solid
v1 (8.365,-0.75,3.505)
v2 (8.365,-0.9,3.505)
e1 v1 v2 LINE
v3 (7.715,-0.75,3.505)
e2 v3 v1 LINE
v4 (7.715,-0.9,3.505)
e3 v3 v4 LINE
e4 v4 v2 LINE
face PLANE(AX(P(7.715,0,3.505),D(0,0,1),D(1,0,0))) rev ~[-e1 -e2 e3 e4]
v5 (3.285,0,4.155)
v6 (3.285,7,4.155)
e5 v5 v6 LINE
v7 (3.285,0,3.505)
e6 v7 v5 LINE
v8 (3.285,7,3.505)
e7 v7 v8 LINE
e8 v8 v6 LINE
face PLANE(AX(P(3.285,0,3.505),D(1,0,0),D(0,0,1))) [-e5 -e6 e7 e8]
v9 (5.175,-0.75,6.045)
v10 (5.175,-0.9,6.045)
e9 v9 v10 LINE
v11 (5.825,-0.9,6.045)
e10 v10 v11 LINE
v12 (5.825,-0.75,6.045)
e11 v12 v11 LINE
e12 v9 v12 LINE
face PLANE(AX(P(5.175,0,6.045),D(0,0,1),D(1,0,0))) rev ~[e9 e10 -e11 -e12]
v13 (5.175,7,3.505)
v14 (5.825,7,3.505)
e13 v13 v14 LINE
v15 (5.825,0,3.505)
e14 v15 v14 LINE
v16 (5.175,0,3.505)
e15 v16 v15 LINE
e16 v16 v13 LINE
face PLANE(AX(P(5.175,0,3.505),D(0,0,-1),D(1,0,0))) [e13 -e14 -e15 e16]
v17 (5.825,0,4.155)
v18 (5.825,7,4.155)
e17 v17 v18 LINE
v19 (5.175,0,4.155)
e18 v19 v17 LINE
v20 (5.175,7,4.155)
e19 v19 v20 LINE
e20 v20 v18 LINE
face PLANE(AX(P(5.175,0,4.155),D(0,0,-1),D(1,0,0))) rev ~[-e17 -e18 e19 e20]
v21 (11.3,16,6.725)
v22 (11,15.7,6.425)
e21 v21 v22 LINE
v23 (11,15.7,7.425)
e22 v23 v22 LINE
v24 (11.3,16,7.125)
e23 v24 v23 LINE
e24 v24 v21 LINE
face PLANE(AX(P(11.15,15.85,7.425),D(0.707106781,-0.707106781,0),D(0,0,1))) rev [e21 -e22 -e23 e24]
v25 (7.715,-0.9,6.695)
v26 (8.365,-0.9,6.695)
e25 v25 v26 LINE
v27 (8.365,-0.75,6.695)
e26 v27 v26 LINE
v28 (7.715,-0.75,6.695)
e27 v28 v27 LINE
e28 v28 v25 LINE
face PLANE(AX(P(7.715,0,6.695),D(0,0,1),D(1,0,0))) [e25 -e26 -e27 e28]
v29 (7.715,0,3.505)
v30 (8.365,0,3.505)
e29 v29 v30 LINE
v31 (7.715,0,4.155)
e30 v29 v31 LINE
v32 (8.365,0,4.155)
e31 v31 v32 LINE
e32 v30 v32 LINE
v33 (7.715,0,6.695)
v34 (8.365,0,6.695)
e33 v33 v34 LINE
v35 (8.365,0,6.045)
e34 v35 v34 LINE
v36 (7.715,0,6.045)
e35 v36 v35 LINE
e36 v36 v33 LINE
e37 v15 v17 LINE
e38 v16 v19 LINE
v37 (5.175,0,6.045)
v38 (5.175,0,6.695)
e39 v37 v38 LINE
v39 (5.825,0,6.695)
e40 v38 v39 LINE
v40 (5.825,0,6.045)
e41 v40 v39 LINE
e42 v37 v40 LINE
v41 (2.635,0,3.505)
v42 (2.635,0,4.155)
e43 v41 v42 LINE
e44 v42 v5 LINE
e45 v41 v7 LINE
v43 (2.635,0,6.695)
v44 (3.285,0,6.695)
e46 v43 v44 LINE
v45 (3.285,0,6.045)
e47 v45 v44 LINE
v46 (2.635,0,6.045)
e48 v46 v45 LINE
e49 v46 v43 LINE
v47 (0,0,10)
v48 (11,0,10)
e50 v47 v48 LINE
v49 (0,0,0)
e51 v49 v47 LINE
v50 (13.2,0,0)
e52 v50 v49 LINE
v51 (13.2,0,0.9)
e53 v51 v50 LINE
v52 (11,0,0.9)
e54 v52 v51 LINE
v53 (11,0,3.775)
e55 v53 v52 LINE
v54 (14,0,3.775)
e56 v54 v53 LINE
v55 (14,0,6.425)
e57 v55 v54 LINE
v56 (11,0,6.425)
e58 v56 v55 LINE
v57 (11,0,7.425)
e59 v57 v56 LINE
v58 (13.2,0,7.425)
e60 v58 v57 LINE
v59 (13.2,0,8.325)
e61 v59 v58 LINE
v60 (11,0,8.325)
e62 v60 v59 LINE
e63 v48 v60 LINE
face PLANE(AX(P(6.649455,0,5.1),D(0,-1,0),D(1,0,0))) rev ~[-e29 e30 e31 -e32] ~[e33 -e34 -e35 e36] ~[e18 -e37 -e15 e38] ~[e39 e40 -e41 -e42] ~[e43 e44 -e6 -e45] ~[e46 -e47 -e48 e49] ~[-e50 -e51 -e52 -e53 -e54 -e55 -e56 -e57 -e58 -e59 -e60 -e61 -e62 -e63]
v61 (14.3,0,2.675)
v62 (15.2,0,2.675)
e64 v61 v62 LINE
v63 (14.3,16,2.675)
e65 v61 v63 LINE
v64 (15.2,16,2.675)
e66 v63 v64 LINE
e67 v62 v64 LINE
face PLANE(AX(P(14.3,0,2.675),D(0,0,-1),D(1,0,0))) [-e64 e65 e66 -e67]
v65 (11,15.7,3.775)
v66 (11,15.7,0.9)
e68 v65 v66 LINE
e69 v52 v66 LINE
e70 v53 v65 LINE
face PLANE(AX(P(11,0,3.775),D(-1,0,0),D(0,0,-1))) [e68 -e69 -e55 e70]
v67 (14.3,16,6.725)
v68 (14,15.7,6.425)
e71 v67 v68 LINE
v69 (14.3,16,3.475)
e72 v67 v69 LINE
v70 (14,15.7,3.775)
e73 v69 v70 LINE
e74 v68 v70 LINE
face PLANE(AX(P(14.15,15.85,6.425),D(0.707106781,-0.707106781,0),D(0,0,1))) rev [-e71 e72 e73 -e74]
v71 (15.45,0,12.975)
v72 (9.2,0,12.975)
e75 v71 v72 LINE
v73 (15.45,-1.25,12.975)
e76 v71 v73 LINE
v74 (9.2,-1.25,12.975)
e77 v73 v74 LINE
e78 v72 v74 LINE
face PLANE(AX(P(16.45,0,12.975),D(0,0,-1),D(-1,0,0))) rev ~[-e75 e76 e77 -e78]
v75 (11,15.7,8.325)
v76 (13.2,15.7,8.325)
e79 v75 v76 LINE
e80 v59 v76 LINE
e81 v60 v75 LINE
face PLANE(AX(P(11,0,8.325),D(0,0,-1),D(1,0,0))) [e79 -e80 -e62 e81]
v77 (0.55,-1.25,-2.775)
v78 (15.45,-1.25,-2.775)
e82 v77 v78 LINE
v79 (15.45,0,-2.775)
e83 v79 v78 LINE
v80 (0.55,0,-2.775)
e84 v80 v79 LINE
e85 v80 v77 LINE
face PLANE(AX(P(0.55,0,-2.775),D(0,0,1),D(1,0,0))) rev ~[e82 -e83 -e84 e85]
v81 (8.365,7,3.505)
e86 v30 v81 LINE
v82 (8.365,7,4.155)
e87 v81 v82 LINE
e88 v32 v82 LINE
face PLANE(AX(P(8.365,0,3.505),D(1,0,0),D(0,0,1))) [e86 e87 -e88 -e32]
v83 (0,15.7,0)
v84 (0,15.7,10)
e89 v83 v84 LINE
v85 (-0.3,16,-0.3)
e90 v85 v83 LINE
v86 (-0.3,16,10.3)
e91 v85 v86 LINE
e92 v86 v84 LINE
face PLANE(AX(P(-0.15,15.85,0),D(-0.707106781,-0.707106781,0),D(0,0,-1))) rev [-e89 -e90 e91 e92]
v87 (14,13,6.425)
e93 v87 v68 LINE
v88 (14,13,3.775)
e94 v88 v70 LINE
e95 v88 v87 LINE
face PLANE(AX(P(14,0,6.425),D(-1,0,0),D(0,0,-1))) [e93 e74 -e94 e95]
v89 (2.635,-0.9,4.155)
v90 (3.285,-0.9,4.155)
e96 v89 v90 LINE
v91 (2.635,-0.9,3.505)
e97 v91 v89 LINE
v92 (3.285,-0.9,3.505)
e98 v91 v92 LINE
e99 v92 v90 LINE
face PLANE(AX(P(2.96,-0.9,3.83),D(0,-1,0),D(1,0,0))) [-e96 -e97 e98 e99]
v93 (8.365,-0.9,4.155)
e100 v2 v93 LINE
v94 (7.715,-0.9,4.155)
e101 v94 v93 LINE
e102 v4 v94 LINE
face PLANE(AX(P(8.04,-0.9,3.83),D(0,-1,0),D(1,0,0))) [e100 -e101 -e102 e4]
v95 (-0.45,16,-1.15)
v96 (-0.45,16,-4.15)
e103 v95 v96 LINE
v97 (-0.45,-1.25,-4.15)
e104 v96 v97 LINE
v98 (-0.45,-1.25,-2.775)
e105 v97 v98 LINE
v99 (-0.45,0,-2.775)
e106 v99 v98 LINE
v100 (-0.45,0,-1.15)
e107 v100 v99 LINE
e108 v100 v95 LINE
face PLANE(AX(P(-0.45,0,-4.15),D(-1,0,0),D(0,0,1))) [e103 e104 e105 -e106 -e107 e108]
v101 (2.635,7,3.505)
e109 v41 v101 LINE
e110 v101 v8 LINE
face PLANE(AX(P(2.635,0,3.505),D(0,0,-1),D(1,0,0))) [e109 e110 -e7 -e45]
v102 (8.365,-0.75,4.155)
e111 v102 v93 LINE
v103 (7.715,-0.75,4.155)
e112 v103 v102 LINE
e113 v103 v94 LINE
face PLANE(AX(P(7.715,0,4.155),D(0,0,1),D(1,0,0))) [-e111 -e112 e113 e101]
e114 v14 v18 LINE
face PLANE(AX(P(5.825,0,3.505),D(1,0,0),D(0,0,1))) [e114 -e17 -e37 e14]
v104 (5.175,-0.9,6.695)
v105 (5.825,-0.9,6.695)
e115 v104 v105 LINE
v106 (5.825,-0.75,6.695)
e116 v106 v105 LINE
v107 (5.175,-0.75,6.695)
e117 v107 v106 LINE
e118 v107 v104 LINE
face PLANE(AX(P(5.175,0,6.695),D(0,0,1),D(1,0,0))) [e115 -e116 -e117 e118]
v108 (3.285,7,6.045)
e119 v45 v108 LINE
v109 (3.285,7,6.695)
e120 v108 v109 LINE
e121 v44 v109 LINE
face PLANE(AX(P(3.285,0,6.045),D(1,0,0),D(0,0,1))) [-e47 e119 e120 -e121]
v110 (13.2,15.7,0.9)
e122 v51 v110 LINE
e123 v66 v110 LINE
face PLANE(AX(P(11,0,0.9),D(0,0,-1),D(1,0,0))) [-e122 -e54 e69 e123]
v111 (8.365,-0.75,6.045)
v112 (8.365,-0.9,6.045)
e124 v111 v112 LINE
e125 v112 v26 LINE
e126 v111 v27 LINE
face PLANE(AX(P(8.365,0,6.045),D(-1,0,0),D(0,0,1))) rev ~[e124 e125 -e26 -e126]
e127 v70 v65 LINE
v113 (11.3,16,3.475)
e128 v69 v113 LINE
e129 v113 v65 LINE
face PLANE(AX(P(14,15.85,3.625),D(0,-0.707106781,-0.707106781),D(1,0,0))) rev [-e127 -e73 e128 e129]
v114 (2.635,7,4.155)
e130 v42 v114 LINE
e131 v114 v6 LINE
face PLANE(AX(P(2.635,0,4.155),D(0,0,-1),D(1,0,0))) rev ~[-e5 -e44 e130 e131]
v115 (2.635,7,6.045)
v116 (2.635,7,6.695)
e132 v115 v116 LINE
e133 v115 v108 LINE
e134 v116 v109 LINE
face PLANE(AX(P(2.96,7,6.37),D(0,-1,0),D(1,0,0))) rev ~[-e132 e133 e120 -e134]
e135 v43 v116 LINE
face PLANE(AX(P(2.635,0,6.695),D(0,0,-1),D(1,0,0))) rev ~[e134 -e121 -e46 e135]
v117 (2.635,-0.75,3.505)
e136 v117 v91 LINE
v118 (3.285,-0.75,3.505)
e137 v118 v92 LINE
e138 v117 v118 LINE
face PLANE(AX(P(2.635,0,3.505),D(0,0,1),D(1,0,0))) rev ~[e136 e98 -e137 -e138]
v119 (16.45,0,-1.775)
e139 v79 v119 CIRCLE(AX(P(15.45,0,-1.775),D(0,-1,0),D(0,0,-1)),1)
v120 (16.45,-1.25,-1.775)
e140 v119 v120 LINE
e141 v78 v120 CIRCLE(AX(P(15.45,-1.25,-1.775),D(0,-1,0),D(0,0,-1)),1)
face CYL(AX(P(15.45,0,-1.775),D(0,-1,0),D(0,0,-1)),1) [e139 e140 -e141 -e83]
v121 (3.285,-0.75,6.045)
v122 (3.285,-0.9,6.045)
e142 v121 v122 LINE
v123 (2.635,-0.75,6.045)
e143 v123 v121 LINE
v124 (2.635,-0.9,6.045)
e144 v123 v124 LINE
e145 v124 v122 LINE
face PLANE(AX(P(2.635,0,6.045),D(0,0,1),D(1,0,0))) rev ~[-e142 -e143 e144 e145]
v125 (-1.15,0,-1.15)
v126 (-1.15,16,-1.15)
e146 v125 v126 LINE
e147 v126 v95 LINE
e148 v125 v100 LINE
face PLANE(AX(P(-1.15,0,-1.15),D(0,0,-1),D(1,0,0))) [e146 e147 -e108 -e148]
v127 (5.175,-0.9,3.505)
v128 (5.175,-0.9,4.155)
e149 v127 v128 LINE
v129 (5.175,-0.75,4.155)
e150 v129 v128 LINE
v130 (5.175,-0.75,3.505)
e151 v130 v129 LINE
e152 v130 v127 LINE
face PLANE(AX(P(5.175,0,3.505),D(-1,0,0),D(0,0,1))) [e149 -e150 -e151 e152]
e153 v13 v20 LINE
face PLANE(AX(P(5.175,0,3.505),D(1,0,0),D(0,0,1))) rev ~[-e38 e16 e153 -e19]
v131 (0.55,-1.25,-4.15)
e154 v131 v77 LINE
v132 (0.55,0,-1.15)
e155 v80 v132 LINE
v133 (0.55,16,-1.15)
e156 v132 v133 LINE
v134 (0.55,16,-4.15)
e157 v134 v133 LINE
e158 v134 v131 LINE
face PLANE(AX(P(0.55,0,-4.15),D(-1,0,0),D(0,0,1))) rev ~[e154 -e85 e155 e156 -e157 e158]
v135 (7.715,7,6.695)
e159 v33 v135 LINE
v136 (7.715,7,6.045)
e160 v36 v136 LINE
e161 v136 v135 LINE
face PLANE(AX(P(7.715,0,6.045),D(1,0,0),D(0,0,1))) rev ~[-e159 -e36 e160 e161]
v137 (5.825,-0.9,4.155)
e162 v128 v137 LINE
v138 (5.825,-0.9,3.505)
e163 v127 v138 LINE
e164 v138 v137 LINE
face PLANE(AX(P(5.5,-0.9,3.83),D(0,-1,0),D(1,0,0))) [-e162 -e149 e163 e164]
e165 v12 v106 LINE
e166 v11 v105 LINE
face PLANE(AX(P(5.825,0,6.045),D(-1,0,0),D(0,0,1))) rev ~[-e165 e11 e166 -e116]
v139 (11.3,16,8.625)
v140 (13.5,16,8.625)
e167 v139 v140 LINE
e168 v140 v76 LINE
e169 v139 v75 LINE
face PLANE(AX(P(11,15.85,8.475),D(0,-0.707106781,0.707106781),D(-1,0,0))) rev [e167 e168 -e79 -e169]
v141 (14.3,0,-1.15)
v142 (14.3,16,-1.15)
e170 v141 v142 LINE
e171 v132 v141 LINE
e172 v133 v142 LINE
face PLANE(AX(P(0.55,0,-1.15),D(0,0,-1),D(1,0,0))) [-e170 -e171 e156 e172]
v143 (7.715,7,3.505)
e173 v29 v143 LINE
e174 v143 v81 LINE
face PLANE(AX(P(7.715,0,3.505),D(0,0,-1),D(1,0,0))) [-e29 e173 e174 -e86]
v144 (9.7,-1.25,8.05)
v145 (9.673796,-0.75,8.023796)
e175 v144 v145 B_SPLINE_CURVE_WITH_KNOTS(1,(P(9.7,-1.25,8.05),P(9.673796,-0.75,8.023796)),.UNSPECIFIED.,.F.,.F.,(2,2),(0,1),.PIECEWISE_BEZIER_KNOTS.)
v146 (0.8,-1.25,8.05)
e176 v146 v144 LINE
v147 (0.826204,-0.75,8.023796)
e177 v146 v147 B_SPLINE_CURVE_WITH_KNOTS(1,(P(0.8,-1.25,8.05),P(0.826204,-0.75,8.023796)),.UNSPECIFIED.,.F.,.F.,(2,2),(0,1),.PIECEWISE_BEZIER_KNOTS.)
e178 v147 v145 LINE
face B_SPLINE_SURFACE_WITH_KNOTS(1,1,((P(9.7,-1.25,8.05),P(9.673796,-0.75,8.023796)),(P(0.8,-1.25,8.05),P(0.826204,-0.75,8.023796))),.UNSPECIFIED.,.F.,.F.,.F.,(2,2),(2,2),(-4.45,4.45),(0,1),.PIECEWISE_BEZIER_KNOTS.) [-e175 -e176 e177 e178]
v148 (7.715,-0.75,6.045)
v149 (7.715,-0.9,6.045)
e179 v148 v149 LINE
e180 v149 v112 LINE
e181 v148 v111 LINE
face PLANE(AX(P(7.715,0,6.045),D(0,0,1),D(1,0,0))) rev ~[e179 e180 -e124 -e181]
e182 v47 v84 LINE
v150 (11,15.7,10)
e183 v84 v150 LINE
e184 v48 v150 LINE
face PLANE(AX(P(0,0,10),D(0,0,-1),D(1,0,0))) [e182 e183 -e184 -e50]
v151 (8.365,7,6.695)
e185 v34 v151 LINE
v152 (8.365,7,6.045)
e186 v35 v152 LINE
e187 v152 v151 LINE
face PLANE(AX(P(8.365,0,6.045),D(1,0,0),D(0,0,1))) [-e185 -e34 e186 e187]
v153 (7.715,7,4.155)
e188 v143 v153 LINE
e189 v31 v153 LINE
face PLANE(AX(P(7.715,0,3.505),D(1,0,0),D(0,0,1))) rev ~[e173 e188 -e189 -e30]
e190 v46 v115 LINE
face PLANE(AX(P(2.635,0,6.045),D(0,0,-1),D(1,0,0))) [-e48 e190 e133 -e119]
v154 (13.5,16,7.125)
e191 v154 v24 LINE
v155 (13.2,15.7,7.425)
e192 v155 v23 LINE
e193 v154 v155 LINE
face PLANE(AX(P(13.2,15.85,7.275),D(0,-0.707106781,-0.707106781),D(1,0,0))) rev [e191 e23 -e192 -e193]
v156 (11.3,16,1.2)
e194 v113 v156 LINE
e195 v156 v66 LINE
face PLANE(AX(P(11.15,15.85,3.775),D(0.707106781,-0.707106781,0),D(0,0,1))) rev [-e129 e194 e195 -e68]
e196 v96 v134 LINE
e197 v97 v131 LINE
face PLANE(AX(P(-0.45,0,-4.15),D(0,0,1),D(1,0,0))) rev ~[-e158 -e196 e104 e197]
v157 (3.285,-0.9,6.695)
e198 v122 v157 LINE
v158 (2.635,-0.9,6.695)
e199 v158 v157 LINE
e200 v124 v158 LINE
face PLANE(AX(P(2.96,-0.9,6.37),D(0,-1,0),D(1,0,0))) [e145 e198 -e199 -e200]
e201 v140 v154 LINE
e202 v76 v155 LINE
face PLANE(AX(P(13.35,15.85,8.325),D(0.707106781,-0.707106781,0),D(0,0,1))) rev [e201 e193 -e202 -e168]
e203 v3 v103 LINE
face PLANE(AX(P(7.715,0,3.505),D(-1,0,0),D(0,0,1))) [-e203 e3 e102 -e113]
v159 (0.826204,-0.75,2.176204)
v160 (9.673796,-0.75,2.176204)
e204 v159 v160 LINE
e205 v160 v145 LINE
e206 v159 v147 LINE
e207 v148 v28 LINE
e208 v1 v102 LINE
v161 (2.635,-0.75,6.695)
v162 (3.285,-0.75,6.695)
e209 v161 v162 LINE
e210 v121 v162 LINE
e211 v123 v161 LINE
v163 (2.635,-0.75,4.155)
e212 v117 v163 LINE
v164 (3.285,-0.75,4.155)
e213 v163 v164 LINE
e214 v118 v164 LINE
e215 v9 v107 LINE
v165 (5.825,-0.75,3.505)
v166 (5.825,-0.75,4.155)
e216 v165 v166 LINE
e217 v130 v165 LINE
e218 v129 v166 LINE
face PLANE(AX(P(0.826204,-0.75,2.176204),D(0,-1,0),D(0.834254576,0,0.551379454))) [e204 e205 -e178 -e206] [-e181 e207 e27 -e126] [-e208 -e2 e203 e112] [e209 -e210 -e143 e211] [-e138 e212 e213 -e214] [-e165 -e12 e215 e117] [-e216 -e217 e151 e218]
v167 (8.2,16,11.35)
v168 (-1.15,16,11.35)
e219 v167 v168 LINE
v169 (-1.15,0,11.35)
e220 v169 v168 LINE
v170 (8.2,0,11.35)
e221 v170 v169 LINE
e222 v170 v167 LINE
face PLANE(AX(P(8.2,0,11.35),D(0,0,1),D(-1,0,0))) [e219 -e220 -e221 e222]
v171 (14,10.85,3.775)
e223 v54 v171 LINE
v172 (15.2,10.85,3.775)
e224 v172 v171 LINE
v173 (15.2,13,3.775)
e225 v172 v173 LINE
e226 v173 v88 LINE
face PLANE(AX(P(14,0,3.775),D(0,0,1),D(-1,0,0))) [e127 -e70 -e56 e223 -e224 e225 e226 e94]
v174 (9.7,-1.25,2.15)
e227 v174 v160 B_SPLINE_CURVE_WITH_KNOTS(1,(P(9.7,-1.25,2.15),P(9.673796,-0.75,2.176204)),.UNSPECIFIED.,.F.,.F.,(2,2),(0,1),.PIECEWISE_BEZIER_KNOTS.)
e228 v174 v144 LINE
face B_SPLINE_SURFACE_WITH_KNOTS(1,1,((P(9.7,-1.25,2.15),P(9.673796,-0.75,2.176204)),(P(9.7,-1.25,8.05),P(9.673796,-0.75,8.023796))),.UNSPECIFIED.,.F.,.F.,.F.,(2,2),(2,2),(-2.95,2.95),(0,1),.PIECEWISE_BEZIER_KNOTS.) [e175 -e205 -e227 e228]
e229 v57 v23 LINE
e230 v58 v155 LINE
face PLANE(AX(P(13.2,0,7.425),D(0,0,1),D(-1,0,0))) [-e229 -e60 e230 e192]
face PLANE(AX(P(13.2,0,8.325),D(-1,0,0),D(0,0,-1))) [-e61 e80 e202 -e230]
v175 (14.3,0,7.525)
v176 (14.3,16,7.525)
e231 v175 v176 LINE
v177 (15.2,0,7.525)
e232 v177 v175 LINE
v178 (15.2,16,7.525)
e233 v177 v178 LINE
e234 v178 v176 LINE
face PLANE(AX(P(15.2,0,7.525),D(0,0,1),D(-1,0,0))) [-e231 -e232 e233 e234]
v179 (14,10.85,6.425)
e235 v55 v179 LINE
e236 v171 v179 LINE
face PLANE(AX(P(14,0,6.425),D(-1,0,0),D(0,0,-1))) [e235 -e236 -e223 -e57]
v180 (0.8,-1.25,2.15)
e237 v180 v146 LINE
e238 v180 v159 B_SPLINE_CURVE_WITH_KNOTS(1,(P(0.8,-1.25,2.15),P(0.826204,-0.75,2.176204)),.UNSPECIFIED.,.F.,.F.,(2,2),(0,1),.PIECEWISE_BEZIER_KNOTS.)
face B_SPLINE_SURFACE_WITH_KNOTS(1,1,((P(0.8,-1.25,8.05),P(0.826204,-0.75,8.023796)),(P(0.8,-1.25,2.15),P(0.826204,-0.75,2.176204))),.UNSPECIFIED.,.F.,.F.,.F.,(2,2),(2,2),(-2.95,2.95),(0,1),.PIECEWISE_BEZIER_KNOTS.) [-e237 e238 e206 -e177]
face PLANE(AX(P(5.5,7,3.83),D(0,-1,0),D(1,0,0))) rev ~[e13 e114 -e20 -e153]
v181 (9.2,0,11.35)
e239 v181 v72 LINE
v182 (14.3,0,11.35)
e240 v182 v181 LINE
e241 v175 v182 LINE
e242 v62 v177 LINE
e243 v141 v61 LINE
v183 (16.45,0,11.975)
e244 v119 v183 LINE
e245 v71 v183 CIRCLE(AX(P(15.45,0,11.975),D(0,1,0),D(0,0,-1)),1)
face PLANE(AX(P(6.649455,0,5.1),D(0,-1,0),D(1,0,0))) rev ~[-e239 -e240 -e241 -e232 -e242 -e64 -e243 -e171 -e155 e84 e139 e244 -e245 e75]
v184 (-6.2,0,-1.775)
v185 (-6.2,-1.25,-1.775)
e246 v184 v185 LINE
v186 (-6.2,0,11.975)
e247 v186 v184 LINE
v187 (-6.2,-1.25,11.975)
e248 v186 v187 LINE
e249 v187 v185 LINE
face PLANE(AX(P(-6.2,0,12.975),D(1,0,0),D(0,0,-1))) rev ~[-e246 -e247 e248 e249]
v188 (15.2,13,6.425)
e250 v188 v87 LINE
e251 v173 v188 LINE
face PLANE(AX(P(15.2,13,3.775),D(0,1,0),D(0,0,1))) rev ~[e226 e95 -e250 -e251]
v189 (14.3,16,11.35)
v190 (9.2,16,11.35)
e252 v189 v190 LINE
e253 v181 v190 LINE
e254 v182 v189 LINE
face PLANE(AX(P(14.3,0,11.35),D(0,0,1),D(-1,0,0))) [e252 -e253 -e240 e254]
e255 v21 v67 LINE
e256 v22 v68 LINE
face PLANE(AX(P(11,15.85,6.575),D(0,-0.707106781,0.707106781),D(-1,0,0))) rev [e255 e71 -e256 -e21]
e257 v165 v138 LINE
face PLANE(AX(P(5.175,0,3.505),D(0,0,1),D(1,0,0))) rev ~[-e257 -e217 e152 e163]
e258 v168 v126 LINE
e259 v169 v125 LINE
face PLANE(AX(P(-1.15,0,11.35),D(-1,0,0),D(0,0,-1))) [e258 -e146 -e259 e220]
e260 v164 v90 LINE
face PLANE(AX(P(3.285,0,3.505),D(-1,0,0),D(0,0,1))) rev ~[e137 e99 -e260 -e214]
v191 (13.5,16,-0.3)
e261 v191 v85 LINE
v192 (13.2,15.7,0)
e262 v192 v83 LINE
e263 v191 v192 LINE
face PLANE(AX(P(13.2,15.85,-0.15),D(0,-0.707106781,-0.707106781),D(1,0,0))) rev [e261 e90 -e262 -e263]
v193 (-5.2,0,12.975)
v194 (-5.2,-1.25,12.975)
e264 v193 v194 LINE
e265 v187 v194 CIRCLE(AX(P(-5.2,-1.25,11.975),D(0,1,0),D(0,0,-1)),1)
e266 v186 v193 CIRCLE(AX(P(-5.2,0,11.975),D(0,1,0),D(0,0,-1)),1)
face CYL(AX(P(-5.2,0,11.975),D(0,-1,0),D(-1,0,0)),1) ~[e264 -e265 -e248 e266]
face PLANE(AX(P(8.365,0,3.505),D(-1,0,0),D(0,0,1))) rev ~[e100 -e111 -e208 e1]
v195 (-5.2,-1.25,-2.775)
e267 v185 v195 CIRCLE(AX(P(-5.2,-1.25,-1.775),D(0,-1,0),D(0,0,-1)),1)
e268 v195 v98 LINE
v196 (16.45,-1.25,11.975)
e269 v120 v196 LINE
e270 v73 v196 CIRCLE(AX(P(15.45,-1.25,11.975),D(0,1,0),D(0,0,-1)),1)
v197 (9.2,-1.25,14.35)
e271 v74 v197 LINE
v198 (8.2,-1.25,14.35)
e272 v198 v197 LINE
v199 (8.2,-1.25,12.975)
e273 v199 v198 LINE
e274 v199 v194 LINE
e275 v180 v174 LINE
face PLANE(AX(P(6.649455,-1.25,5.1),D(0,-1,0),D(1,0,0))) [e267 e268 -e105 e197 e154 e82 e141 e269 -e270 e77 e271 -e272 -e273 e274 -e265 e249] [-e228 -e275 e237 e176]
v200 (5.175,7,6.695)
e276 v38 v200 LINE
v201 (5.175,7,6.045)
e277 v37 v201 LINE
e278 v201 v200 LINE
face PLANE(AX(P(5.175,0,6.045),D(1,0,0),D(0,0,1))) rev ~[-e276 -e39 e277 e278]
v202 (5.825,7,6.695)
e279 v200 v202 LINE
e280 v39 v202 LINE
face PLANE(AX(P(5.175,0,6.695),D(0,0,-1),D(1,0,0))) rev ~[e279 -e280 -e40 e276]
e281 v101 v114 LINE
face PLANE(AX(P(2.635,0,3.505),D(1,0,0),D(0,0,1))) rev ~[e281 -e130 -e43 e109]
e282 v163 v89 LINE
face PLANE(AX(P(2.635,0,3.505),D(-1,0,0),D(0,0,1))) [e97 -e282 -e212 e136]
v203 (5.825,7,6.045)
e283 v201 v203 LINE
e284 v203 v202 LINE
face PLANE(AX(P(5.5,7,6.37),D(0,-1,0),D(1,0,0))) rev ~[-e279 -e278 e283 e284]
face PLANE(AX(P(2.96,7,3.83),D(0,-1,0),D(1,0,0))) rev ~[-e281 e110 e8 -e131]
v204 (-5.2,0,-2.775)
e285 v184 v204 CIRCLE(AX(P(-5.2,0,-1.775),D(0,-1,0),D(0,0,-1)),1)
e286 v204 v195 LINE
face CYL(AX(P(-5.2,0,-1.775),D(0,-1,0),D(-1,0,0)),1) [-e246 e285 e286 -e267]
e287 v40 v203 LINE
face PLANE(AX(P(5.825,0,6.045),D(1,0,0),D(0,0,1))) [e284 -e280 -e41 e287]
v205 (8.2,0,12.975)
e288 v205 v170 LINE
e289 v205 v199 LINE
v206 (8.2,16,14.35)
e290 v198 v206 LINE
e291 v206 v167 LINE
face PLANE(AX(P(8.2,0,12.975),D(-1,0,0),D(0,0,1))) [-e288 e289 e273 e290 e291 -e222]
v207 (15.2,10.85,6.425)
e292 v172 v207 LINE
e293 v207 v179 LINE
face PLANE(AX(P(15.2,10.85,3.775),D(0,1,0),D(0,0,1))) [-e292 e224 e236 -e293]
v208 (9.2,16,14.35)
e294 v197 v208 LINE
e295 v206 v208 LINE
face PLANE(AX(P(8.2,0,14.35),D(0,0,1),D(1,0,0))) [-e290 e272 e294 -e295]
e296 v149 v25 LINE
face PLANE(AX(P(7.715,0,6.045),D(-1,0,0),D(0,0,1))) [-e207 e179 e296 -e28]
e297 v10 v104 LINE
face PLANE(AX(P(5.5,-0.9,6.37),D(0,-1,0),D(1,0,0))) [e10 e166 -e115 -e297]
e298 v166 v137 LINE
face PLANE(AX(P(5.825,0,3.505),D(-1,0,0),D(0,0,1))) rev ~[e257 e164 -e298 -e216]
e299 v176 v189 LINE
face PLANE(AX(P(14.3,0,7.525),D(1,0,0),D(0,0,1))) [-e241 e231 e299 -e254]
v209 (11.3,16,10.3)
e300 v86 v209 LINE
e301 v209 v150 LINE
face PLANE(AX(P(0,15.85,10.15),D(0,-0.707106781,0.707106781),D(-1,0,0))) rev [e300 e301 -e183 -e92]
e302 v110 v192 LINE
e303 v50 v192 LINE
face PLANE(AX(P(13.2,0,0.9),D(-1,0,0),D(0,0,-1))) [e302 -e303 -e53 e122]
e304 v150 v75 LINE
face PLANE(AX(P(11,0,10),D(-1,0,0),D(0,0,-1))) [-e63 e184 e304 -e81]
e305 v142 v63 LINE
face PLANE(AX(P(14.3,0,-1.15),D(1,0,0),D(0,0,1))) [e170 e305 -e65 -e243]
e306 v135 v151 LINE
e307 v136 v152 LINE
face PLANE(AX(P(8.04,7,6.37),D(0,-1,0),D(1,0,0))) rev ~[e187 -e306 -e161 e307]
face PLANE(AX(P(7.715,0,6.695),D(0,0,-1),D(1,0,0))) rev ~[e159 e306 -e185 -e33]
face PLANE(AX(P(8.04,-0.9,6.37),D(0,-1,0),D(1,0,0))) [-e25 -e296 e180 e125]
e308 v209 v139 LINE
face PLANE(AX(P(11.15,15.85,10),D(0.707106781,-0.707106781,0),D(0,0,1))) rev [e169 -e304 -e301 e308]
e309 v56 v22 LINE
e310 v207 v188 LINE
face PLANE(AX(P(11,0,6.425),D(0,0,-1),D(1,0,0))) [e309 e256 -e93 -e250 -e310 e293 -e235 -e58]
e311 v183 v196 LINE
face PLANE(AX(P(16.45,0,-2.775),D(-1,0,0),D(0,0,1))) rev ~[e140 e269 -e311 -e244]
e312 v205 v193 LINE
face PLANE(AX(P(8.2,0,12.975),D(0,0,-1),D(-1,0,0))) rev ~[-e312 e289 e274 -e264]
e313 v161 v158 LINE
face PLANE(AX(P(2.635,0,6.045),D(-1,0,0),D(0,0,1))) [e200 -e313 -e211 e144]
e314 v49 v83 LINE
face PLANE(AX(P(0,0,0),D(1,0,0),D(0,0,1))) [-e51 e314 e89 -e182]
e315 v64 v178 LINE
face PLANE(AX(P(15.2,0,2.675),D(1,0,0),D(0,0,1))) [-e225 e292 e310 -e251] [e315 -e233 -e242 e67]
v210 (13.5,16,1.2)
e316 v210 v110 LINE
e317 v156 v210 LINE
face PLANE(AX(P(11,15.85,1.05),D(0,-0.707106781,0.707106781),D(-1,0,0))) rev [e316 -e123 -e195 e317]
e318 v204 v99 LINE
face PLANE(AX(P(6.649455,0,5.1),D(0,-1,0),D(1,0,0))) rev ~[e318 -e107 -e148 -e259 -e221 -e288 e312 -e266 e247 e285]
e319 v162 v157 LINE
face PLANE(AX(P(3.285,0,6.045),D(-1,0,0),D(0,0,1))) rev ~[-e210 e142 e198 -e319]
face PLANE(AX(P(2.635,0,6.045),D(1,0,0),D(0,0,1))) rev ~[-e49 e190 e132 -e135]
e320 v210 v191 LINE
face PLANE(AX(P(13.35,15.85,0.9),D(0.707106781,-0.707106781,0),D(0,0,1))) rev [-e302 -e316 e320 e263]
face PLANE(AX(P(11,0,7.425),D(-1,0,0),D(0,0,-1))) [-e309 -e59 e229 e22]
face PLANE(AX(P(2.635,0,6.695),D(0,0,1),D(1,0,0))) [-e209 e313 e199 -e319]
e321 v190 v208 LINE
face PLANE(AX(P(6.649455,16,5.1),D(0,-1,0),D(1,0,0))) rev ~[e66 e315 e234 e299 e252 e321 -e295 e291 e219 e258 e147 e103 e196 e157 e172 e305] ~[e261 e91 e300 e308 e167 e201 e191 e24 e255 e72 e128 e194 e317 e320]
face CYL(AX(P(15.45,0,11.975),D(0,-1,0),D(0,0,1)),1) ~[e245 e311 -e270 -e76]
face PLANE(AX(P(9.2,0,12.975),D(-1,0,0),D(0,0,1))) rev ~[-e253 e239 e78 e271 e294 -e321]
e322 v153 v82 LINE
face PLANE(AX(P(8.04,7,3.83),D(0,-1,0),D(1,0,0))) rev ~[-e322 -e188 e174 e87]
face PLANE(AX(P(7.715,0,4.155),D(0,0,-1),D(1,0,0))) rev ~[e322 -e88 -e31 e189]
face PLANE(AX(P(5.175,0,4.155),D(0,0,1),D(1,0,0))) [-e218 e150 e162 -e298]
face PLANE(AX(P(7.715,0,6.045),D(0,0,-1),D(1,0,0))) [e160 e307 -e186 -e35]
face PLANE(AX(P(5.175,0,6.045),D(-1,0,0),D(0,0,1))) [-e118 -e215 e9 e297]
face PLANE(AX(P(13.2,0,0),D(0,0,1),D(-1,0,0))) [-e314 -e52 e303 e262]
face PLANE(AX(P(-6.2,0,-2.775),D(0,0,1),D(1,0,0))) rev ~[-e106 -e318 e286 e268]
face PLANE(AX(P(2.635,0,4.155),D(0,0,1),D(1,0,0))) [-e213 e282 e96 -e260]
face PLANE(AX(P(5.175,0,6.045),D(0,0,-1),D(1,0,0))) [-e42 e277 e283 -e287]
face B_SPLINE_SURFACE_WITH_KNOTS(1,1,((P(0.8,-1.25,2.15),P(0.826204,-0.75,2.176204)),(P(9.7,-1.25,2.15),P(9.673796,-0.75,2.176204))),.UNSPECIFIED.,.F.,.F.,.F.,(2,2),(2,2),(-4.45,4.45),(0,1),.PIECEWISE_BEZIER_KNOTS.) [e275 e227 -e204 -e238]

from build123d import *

# Parameters (mm, degrees)
F0_W          = 1
F0_H          = 1.375
F1_DEPTH      = 16
F0_W_2        = 0.65
F0_H_2        = 0.65
F2_DEPTH      = 1.25
F3_W          = 2.15
F3_H          = 2.65
F4_DEPTH      = 1.2
F5_R          = 1
F6_W          = 8.9
F6_H          = 5.9
F7_DEPTH      = 0.5
F7_TAPER      = 3
F8_DEPTH      = 7
F8_DEPTH_BACK = 0.9
F9_SIZE       = 0.3


# Not quite as in the source:
# - a feature names something its author has since deleted; it is built from what else it names


with BuildPart() as f1:
    # F0 (on Front) → F1 (new body)
    with BuildSketch(Plane.XZ):
        Polygon((-1.15, 11.35), (-1.15, -1.15), (-0.45, -1.15), (-0.45, -2.775), (0.55, -2.775), (0.55, -1.15), (14.3, -1.15), (14.3, 2.675), (15.2, 2.675), (15.2, 7.525), (14.3, 7.525), (14.3, 11.35), (9.2, 11.35), (9.2, 12.975), (8.2, 12.975), (8.2, 11.35), align=None)
        Polygon((13.2, 0), (0, 0), (0, 10), (11, 10), (11, 8.325), (13.2, 8.325), (13.2, 7.425), (11, 7.425), (11, 6.425), (14, 6.425), (14, 3.775), (11, 3.775), (11, 0.9), (13.2, 0.9), align=None, mode=Mode.SUBTRACT)
        with Locations((8.7, 13.6625)):
            Rectangle(F0_W, F0_H)
        with Locations((0.05, -3.4625)):
            Rectangle(F0_W, F0_H)
    extrude(amount=-F1_DEPTH)

    # F0 (on Front) → F2 (join)
    with BuildSketch(Plane.XZ):
        Polygon((-1.15, 11.35), (-1.15, -1.15), (-0.45, -1.15), (-0.45, -2.775), (0.55, -2.775), (0.55, -1.15), (14.3, -1.15), (14.3, 2.675), (15.2, 2.675), (15.2, 7.525), (14.3, 7.525), (14.3, 11.35), (9.2, 11.35), (9.2, 12.975), (8.2, 12.975), (8.2, 11.35), align=None)
        Polygon((13.2, 0), (0, 0), (0, 10), (11, 10), (11, 8.325), (13.2, 8.325), (13.2, 7.425), (11, 7.425), (11, 6.425), (14, 6.425), (14, 3.775), (11, 3.775), (11, 0.9), (13.2, 0.9), align=None, mode=Mode.SUBTRACT)
        Polygon((-0.45, -1.15), (-1.15, -1.15), (-1.15, 11.35), (8.2, 11.35), (8.2, 12.975), (-6.2, 12.975), (-6.2, -2.775), (-0.45, -2.775), align=None)
        with Locations((0.05, -3.4625)):
            Rectangle(F0_W, F0_H)
        Polygon((0.55, -1.15), (0.55, -2.775), (16.45, -2.775), (16.45, 12.975), (9.2, 12.975), (9.2, 11.35), (14.3, 11.35), (14.3, 7.525), (15.2, 7.525), (15.2, 2.675), (14.3, 2.675), (14.3, -1.15), align=None)
        with Locations((8.7, 13.6625)):
            Rectangle(F0_W, F0_H)
        Polygon((0, 10), (0, 0), (13.2, 0), (13.2, 0.9), (11, 0.9), (11, 3.775), (14, 3.775), (14, 6.425), (11, 6.425), (11, 7.425), (13.2, 7.425), (13.2, 8.325), (11, 8.325), (11, 10), align=None)
        with Locations((2.96, 3.83)):
            Rectangle(F0_W_2, F0_H_2, mode=Mode.SUBTRACT)
        with Locations((5.5, 3.83)):
            Rectangle(F0_W_2, F0_H_2, mode=Mode.SUBTRACT)
        with Locations((8.04, 3.83)):
            Rectangle(F0_W_2, F0_H_2, mode=Mode.SUBTRACT)
        with Locations((2.96, 6.37)):
            Rectangle(F0_W_2, F0_H_2, mode=Mode.SUBTRACT)
        with Locations((5.5, 6.37)):
            Rectangle(F0_W_2, F0_H_2, mode=Mode.SUBTRACT)
        with Locations((8.04, 6.37)):
            Rectangle(F0_W_2, F0_H_2, mode=Mode.SUBTRACT)
    extrude(amount=F2_DEPTH)

    # F3 (on face) → F4 (cut, through all)
    with BuildSketch(Plane.YZ.offset(15.2)):
        with Locations((11.925, 5.1)):
            Rectangle(F3_W, F3_H)
    extrude(amount=-F4_DEPTH, mode=Mode.SUBTRACT)

    # F5
    f5_edges = [f1.edges().sort_by_distance(p)[0] for p in [
        (16.45, -0.625, 12.975),
        (-6.2, -0.625, 12.975),
        (16.45, -0.625, -2.775),
        (-6.2, -0.625, -2.775),
    ]]
    fillet(f5_edges, radius=F5_R)

    # F6 (on face) → F7 (cut)
    with BuildSketch(Plane.XZ.offset(1.25)):
        with Locations((5.25, 5.1)):
            Rectangle(F6_W, F6_H)
    extrude(amount=-F7_DEPTH, taper=F7_TAPER, mode=Mode.SUBTRACT)

    # F0 (on Front) → F8 (join, two sides)
    with BuildSketch(Plane.XZ) as f8_sk:
        with Locations((2.96, 6.37)):
            Rectangle(F0_W_2, F0_H_2)
        with Locations((5.5, 6.37)):
            Rectangle(F0_W_2, F0_H_2)
        with Locations((8.04, 6.37)):
            Rectangle(F0_W_2, F0_H_2)
        with Locations((2.96, 3.83)):
            Rectangle(F0_W_2, F0_H_2)
        with Locations((5.5, 3.83)):
            Rectangle(F0_W_2, F0_H_2)
        with Locations((8.04, 3.83)):
            Rectangle(F0_W_2, F0_H_2)
    extrude(amount=-F8_DEPTH)
    extrude(f8_sk.sketch, amount=F8_DEPTH_BACK)

    # F9
    f9_edges = [f1.edges().sort_by_distance(p)[0] for p in [
        (12.1, 16, 7.425),
        (13.2, 16, 7.875),
        (5.5, 16, 10),
        (0, 16, 5),
        (6.6, 16, 0),
        (12.1, 16, 0.9),
        (13.2, 16, 0.45),
        (11, 16, 2.3375),
        (12.5, 16, 3.775),
        (14, 16, 5.1),
        (12.5, 16, 6.425),
        (11, 16, 6.925),
        (12.1, 16, 8.325),
        (11, 16, 9.1625),
    ]]
    chamfer(f9_edges, length=F9_SIZE)


solid = f1.part
